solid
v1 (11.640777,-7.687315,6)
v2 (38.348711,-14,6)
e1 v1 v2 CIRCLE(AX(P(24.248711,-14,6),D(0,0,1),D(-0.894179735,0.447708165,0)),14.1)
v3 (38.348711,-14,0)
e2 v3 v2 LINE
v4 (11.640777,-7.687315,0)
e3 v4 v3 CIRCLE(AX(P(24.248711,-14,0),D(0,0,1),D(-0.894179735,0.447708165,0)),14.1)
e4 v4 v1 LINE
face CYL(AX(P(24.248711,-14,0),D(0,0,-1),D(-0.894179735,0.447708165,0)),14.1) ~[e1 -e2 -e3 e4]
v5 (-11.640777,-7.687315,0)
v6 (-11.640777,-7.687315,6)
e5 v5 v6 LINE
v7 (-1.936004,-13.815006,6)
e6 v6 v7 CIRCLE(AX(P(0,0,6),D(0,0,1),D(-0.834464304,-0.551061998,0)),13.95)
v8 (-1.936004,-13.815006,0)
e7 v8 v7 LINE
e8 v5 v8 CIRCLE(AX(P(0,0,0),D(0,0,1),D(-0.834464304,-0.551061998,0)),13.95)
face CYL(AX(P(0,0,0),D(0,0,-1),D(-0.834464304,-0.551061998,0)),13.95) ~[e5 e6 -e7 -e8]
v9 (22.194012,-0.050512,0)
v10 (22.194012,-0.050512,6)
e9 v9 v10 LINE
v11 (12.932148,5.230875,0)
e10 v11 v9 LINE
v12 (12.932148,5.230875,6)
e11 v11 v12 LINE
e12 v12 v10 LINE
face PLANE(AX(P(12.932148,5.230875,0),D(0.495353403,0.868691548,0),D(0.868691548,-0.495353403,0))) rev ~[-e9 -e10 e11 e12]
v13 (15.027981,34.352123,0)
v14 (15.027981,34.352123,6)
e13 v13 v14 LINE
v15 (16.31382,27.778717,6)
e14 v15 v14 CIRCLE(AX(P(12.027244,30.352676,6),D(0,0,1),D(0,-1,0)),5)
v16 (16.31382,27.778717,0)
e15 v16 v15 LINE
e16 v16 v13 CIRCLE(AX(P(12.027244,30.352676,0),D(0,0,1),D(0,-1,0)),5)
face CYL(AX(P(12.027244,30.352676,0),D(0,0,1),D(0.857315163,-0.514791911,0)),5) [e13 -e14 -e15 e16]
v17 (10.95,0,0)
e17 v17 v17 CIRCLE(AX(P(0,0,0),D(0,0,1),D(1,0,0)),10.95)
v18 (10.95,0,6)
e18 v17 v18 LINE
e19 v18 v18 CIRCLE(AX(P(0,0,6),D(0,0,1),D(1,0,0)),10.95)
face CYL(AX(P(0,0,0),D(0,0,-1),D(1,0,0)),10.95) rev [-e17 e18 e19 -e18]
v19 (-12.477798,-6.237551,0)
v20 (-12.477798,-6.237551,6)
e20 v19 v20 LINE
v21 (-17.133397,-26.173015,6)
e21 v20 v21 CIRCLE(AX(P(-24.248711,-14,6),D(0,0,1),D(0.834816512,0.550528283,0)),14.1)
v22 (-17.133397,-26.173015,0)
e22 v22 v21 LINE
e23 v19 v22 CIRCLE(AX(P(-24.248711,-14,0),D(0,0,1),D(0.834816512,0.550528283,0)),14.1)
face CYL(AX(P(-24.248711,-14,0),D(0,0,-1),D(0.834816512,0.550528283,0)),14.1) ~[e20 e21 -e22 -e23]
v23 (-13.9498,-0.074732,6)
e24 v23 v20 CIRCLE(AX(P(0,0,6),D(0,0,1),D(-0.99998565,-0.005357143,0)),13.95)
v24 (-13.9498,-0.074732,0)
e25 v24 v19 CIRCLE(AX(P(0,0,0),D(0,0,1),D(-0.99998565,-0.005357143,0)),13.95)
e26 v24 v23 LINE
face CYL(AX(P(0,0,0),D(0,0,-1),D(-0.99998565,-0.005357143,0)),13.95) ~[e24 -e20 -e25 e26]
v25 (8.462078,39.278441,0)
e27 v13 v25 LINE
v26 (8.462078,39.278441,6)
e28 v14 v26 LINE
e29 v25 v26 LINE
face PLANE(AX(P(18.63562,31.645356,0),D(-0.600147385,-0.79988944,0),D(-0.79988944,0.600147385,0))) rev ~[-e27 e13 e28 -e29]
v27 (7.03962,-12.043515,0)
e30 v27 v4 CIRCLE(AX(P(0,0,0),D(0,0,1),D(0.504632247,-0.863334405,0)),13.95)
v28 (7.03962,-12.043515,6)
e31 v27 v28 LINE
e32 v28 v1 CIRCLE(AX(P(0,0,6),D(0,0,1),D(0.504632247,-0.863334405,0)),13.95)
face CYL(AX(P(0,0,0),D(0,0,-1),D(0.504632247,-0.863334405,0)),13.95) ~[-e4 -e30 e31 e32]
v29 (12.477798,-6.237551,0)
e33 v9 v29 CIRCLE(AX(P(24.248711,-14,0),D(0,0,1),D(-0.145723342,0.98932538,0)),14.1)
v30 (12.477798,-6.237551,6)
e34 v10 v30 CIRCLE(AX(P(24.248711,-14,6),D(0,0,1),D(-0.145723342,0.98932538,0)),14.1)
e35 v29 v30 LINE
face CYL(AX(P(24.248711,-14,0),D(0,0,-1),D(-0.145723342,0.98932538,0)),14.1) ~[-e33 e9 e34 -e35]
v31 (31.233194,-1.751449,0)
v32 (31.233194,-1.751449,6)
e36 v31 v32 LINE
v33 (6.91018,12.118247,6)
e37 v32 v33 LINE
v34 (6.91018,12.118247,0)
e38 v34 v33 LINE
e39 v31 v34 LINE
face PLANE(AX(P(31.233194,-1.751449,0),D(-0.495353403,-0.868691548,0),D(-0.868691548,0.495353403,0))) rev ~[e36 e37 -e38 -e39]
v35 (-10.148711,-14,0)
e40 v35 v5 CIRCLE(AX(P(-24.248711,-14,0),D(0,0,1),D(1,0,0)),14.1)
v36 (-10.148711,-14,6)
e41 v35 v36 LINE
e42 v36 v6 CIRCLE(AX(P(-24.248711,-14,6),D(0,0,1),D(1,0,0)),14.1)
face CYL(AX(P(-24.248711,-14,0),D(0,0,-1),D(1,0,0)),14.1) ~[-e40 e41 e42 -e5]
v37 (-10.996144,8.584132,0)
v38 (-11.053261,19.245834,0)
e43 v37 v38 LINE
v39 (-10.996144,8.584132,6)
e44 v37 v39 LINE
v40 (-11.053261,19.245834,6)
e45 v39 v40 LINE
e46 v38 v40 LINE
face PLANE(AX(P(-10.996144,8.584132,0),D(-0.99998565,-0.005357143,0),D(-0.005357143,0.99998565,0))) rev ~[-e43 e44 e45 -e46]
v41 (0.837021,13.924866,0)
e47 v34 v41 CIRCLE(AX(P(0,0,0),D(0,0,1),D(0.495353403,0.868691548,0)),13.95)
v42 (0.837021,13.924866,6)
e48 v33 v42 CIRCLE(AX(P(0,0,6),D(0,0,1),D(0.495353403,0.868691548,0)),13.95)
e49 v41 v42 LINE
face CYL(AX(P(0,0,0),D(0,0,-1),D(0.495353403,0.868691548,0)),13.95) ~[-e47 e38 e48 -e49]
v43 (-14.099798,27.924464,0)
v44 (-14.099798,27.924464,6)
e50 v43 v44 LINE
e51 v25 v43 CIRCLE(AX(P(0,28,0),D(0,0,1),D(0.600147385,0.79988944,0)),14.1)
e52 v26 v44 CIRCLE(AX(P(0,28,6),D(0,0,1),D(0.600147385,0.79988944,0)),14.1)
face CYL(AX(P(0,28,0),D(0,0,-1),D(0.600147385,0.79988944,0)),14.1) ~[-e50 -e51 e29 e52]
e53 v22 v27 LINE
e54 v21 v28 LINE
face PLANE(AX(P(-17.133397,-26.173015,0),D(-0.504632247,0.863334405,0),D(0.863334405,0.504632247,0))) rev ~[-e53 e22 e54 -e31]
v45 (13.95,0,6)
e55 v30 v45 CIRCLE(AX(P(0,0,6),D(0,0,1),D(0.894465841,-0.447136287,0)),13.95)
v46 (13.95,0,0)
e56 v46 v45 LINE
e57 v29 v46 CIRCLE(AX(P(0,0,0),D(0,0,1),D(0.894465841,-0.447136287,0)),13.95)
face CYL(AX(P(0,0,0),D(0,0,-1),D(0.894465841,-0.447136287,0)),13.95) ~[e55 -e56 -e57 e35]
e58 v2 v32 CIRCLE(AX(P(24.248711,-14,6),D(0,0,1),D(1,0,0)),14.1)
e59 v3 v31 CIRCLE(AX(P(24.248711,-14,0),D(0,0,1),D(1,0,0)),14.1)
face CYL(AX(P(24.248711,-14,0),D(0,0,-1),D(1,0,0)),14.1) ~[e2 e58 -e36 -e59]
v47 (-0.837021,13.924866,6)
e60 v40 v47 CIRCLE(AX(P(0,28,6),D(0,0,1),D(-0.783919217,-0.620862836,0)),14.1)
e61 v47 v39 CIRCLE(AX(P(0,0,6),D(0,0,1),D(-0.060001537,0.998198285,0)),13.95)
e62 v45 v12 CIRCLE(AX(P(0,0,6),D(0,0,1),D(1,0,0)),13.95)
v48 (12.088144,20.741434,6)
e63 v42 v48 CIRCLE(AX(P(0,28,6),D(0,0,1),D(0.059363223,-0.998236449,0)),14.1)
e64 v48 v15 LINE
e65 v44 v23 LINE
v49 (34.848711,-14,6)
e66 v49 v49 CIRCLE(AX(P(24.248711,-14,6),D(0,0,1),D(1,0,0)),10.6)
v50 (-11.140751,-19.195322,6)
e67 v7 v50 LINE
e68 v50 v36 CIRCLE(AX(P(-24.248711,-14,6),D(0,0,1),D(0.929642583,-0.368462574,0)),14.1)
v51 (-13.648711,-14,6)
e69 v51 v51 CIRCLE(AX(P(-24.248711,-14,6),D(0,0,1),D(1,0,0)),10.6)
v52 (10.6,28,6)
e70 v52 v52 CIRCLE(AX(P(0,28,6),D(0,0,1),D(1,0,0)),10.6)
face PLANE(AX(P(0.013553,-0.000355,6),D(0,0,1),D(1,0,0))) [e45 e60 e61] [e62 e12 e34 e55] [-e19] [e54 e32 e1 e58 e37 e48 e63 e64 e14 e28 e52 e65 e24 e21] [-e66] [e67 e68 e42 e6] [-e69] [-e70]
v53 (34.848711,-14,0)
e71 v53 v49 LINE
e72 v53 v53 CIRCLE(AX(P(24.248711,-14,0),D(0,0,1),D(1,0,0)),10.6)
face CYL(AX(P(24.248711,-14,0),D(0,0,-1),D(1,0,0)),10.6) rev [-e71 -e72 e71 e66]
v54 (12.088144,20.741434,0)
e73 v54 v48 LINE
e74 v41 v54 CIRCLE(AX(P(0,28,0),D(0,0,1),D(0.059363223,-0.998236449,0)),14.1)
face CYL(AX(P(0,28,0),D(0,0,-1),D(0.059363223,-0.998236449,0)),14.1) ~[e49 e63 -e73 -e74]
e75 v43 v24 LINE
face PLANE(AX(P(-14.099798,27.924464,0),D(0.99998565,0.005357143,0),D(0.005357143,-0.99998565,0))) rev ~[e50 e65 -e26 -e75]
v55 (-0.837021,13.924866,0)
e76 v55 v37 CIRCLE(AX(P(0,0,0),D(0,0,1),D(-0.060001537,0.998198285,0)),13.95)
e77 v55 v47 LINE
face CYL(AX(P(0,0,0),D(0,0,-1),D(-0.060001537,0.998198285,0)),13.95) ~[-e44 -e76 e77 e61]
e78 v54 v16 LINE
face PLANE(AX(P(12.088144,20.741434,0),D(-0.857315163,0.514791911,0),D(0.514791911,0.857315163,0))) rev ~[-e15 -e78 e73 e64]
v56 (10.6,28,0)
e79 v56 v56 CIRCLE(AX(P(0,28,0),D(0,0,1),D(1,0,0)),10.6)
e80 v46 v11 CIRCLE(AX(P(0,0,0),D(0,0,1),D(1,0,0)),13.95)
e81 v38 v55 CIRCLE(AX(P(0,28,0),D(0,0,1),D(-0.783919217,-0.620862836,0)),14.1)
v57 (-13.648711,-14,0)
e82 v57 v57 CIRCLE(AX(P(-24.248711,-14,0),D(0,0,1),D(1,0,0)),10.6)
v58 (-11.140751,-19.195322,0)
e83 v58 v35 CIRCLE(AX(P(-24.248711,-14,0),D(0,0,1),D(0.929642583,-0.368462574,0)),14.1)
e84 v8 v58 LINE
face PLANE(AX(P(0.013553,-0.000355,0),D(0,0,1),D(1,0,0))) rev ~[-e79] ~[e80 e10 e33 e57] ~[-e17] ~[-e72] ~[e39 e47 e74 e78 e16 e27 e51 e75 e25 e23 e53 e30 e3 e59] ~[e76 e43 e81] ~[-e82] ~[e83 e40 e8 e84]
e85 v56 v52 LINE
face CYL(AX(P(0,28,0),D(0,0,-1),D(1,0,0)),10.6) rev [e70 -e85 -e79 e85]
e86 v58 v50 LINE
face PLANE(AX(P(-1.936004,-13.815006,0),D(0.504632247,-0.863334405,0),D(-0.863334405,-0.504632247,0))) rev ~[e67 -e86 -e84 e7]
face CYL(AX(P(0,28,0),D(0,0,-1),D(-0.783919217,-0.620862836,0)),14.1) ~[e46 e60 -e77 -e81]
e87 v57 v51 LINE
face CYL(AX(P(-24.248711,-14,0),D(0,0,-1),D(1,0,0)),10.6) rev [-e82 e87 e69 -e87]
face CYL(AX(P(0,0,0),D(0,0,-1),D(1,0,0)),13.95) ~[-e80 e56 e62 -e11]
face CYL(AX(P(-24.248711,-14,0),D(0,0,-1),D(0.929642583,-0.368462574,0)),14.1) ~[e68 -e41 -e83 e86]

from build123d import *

# Parameters (mm, degrees)
F0_R     = 10.95
F0_R_2   = 10.6
F1_DEPTH = 6
F2_R     = 5


with BuildPart() as f1:
    # F0 (on Top) → F1 (new body)
    with BuildSketch(Plane.XY):
        with BuildLine():
            ThreePointArc((12.4777984827, -6.2375512043), (13.5769618994, -3.2044665053), (13.95, 0))
            ThreePointArc((13.95, 0), (13.6931728351, 2.6644920167), (12.932147999, 5.2308745094))
            ThreePointArc((12.932147999, 5.2308745094), (10.5018317529, 9.1822671401), (6.9101799774, 12.118247096))
            ThreePointArc((6.9101799774, 12.118247096), (3.977530702, 13.3709292689), (0.8370214411, 13.9248660714))
            ThreePointArc((0.8370214411, 13.9248660714), (0, 13.9), (-0.8370214411, 13.9248660714))
            ThreePointArc((-0.8370214411, 13.9248660714), (-6.4912873033, 12.3476997512), (-10.9961438792, 8.5841318599))
            ThreePointArc((-10.9961438792, 8.5841318599), (-13.2029923977, 4.5037197676), (-13.9497998232, -0.0747321429))
            ThreePointArc((-13.9497998232, -0.0747321429), (-13.5683297701, -3.2408220022), (-12.4777984827, -6.2375512043))
            ThreePointArc((-12.4777984827, -6.2375512043), (-12.0377531126, -6.95), (-11.6407770416, -7.6873148672))
            ThreePointArc((-11.6407770416, -7.6873148672), (-7.4477777849, -11.7954697264), (-1.9360037904, -13.8150059473))
            ThreePointArc((-1.9360037904, -13.8150059473), (2.7011607312, -13.6859866544), (7.0396198458, -12.0435149532))
            ThreePointArc((7.0396198458, -12.0435149532), (9.5907990681, -10.1301072667), (11.6407770416, -7.6873148672))
            ThreePointArc((11.6407770416, -7.6873148672), (12.0377531126, -6.95), (12.4777984827, -6.2375512043))
        make_face()
        Circle(F0_R, mode=Mode.SUBTRACT)
        with BuildLine():
            ThreePointArc((6.9101799774, 12.118247096), (10.5018317529, 9.1822671401), (12.932147999, 5.2308745094))
            Line((12.932147999, 5.2308745094), (22.1940121838, -0.0505121414))
            ThreePointArc((22.1940121838, -0.0505121414), (26.8561983982, -0.1431962176), (31.2331942939, -1.7514491718))
            Line((31.2331942939, -1.7514491718), (6.9101799774, 12.118247096))
        make_face()
        with BuildLine():
            ThreePointArc((22.1940121838, -0.0505121414), (16.67528741, -2.1065879373), (12.4777984827, -6.2375512043))
            ThreePointArc((12.4777984827, -6.2375512043), (12.0810543828, -6.975), (11.6407770416, -7.6873148672))
            ThreePointArc((11.6407770416, -7.6873148672), (21.0054007386, -27.7219144642), (38.348711306, -14))
            ThreePointArc((38.348711306, -14), (36.4407416974, -6.9173172501), (31.2331942939, -1.7514491718))
            ThreePointArc((31.2331942939, -1.7514491718), (26.8561983982, -0.1431962176), (22.1940121838, -0.0505121414))
        make_face()
        with Locations((24.248711306, -14)):
            Circle(F0_R_2, mode=Mode.SUBTRACT)
        with BuildLine():
            ThreePointArc((11.6407770416, -7.6873148672), (12.0810543828, -6.975), (12.4777984827, -6.2375512043))
            ThreePointArc((12.4777984827, -6.2375512043), (12.0377531126, -6.95), (11.6407770416, -7.6873148672))
        make_face()
        with BuildLine():
            ThreePointArc((-0.8370214411, 13.9248660714), (0, 13.9), (0.8370214411, 13.9248660714))
            ThreePointArc((0.8370214411, 13.9248660714), (0, 13.95), (-0.8370214411, 13.9248660714))
        make_face()
        with BuildLine():
            ThreePointArc((-0.8370214411, 13.9248660714), (0, 13.95), (0.8370214411, 13.9248660714))
            ThreePointArc((0.8370214411, 13.9248660714), (7.3062558034, 15.940620823), (12.0881437953, 20.7414340546))
            ThreePointArc((12.0881437953, 20.7414340546), (13.5877302651, 24.2338897729), (14.1, 28))
            ThreePointArc((14.1, 28), (12.6120042357, 34.3045498776), (8.4620781334, 39.2784411008))
            ThreePointArc((8.4620781334, 39.2784411008), (-6.338309536, 40.5950717436), (-14.0997976707, 27.9244642857))
            ThreePointArc((-14.0997976707, 27.9244642857), (-13.3040875478, 23.329747917), (-11.0532609603, 19.2458340121))
            ThreePointArc((-11.0532609603, 19.2458340121), (-6.5132847974, 15.4945163569), (-0.8370214411, 13.9248660714))
        make_face()
        with Locations((0, 28)):
            Circle(F0_R_2, mode=Mode.SUBTRACT)
        with BuildLine():
            Line((-17.1333966231, -26.1730151139), (7.0396198458, -12.0435149532))
            ThreePointArc((7.0396198458, -12.0435149532), (2.7011607312, -13.6859866544), (-1.9360037904, -13.8150059473))
            Line((-1.9360037904, -13.8150059473), (-11.1407508896, -19.1953222924))
            ThreePointArc((-11.1407508896, -19.1953222924), (-13.5521107613, -23.1865519531), (-17.1333966231, -26.1730151139))
        make_face()
        with BuildLine():
            ThreePointArc((14.1, 28), (13.5877302651, 24.2338897729), (12.0881437953, 20.7414340546))
            Line((12.0881437953, 20.7414340546), (18.6356199511, 31.6453555542))
            Line((18.6356199511, 31.6453555542), (8.4620781334, 39.2784411008))
            ThreePointArc((8.4620781334, 39.2784411008), (12.6120042357, 34.3045498776), (14.1, 28))
        make_face()
        with BuildLine():
            ThreePointArc((-12.4777984827, -6.2375512043), (-37.9792640143, -10.7934563276), (-17.1333966231, -26.1730151139))
            ThreePointArc((-17.1333966231, -26.1730151139), (-13.5521107613, -23.1865519531), (-11.1407508896, -19.1953222924))
            ThreePointArc((-11.1407508896, -19.1953222924), (-10.398941599, -16.64459431), (-10.148711306, -14))
            ThreePointArc((-10.148711306, -14), (-10.5267968417, -10.7566894326), (-11.6407770416, -7.6873148672))
            ThreePointArc((-11.6407770416, -7.6873148672), (-12.0810543828, -6.975), (-12.4777984827, -6.2375512043))
        make_face()
        with Locations((-24.248711306, -14)):
            Circle(F0_R_2, mode=Mode.SUBTRACT)
        with BuildLine():
            ThreePointArc((-13.9497998232, -0.0747321429), (-13.2029923977, 4.5037197676), (-10.9961438792, 8.5841318599))
            Line((-10.9961438792, 8.5841318599), (-11.0532609603, 19.2458340121))
            ThreePointArc((-11.0532609603, 19.2458340121), (-13.3040875478, 23.329747917), (-14.0997976707, 27.9244642857))
            Line((-14.0997976707, 27.9244642857), (-13.9497998232, -0.0747321429))
        make_face()
        with BuildLine():
            ThreePointArc((-12.4777984827, -6.2375512043), (-12.0810543828, -6.975), (-11.6407770416, -7.6873148672))
            ThreePointArc((-11.6407770416, -7.6873148672), (-12.0377531126, -6.95), (-12.4777984827, -6.2375512043))
        make_face()
    extrude(amount=F1_DEPTH)

    # F2
    f2_edges = [f1.edges().sort_by_distance(p)[0] for p in [
        (18.63562, 31.645356, 3),
    ]]
    fillet(f2_edges, radius=F2_R)


solid = f1.part
